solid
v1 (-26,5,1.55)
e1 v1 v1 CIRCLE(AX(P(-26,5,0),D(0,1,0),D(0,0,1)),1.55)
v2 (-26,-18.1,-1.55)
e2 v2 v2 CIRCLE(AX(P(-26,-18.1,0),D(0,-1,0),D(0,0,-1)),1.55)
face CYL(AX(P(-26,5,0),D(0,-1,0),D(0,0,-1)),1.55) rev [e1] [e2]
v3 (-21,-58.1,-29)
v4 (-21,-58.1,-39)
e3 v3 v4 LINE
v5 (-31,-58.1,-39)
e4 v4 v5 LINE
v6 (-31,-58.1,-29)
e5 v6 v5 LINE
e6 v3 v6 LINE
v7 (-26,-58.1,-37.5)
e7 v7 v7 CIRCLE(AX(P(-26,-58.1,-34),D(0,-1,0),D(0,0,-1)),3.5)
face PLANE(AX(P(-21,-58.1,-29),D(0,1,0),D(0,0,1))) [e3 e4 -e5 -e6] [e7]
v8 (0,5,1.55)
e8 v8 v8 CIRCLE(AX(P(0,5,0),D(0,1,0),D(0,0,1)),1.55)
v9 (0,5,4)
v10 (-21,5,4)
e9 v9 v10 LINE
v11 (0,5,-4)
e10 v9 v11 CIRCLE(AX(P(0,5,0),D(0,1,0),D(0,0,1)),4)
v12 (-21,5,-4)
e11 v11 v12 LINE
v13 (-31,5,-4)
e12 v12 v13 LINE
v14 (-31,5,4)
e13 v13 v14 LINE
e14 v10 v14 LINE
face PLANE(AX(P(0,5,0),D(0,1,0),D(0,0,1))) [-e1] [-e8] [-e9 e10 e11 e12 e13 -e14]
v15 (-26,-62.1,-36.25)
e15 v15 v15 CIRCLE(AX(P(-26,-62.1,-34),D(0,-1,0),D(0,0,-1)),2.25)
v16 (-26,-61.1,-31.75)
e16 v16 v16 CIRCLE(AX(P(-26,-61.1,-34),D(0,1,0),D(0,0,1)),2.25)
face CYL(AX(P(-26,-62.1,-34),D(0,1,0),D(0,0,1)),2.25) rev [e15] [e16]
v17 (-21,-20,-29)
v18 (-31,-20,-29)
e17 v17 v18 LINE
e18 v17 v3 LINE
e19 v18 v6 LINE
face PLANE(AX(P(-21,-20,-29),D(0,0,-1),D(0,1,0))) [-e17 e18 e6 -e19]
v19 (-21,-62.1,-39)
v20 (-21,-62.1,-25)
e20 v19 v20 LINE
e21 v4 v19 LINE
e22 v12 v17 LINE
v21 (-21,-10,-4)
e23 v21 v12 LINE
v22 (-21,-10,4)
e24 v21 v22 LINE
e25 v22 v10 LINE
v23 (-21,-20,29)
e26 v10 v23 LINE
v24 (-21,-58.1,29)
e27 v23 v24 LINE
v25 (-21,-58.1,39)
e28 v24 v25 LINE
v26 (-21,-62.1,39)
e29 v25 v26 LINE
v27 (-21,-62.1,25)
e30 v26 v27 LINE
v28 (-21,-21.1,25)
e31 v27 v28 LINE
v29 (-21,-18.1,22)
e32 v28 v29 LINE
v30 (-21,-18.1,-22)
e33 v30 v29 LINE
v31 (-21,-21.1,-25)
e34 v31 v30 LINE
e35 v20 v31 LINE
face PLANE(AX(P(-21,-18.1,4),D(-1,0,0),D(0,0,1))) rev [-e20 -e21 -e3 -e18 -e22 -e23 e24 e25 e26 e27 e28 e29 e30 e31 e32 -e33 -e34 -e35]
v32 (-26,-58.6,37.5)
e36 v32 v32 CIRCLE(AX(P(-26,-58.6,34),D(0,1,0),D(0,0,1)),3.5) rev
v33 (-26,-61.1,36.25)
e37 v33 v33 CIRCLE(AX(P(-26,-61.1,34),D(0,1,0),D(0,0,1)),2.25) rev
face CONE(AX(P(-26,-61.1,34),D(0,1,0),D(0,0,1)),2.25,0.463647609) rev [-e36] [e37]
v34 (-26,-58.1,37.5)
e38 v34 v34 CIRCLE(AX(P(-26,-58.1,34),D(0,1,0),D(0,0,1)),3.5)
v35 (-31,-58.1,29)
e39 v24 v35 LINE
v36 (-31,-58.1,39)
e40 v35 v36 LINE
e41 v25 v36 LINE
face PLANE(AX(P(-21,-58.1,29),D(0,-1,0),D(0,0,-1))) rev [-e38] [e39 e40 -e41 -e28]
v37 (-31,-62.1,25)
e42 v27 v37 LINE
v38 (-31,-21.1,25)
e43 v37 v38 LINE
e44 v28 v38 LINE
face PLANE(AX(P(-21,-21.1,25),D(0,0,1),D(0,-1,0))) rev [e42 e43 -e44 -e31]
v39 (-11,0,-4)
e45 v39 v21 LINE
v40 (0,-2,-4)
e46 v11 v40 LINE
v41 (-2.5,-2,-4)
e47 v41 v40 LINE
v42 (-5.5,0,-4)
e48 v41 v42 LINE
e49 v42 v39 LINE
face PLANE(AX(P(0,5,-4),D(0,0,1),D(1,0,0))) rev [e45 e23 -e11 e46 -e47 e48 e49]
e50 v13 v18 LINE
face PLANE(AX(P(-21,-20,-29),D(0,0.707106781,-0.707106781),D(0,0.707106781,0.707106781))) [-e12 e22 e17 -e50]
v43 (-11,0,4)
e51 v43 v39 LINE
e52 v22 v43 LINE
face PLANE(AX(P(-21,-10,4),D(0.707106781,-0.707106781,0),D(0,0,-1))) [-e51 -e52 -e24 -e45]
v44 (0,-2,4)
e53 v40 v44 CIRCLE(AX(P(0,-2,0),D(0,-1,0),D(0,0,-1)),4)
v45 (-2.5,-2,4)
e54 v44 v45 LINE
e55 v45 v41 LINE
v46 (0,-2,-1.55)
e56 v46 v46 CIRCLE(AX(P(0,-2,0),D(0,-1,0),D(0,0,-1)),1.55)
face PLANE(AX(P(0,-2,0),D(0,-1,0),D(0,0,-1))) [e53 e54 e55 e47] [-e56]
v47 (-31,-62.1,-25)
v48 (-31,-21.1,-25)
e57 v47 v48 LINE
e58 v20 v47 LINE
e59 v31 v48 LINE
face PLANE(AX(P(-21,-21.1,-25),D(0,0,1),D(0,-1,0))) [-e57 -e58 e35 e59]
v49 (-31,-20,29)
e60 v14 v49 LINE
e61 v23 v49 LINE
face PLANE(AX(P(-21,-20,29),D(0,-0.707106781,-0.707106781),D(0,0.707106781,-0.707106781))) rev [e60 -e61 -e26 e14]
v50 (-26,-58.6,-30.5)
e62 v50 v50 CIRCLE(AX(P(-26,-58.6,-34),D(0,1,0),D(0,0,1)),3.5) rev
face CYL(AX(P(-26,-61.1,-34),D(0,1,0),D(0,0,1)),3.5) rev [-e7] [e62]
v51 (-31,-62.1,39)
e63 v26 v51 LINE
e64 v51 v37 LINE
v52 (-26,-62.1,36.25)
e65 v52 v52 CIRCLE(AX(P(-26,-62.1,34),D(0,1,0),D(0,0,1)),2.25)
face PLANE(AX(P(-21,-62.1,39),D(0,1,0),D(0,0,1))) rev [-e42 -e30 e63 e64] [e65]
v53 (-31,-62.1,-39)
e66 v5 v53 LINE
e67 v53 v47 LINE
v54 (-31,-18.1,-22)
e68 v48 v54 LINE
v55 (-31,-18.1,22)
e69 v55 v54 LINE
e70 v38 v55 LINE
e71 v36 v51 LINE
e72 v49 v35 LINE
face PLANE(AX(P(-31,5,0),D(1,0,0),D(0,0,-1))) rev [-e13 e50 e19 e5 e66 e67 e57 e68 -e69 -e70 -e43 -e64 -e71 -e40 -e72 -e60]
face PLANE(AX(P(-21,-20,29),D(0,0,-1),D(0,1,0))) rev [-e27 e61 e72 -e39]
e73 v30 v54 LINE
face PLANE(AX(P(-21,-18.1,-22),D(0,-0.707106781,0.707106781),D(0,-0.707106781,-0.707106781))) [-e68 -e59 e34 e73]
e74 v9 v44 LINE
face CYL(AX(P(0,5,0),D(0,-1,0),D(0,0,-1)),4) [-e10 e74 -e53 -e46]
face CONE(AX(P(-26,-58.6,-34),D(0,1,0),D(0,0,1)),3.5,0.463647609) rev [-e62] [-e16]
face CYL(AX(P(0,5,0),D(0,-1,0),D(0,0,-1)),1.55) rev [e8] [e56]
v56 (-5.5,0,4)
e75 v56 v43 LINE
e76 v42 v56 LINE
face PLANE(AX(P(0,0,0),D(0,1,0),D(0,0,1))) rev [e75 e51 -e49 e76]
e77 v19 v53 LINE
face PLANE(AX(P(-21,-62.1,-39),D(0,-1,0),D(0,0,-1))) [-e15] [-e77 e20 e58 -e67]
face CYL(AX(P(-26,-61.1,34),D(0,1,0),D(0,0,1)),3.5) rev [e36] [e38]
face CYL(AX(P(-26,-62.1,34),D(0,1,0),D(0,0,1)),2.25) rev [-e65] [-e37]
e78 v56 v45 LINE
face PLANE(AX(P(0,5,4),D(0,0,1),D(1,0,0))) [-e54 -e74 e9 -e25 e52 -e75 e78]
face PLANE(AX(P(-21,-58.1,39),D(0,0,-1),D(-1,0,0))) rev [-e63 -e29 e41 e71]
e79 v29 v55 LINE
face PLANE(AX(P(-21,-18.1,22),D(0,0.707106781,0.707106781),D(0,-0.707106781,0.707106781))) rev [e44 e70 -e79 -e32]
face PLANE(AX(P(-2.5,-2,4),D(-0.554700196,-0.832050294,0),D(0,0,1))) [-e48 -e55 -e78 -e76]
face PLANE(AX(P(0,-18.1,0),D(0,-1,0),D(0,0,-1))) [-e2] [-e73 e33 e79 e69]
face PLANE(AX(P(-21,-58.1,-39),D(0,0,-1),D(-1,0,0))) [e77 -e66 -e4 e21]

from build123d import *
from build123d.topology import SkipClean

# Parameters (mm, degrees)
SKETCH1_R                 = 1.55
BOSS_EXTRUDE1_DEPTH       = 5
BOSS_EXTRUDE2_START       = 2
SKETCH2_R                 = 1.55
BOSS_EXTRUDE2_DEPTH       = 2
CHAMFER1_SIZE2            = 2
CHAMFER1_SIZE             = 3
BOSS_EXTRUDE3_START       = 18.1
SKETCH3_W                 = 10
SKETCH3_H                 = 8
SKETCH3_R                 = 1.55
BOSS_EXTRUDE3_DEPTH       = 18.1
BOSS_EXTRUDE4_DEPTH       = 10
CHAMFER2_SIZE             = 10
SKETCH6_R                 = 2.25
CUT_EXTRUDE2_DEPTH        = 81.396579529
SKETCH7_R                 = 3.5
CUT_EXTRUDE3_DEPTH        = 3
CHAMFER3_SIZE2            = 1.25
CHAMFER3_SIZE             = 2.5
CHAMFER3_OF_MIRROR2_SIZE2 = 1.25
CHAMFER3_OF_MIRROR2_SIZE  = 2.5


with BuildPart() as part:
    # Sketch1 → Boss-Extrude1 (new body)
    with BuildSketch(Plane(origin=(0, 0, 0), x_dir=(1, 0, 0), z_dir=(0, 1, 0))):
        with BuildLine():
            Line((0, 4), (-31, 4))
            Line((-31, 4), (-31, -4))
            Line((-31, -4), (0, -4))
            ThreePointArc((0, -4), (4, 0), (0, 4))
        make_face()
        with Locations(Location((0, 0, 0), (0, 0, 270))):
            Circle(SKETCH1_R, mode=Mode.SUBTRACT)
        with Locations(Location((-26, 0, 0), (0, 0, 270))):
            Circle(SKETCH1_R, mode=Mode.SUBTRACT)
    extrude(amount=BOSS_EXTRUDE1_DEPTH)

    # Sketch2 → Boss-Extrude2 (add)
    with SkipClean():  # the faces are left unmerged after this step: merging them gives an invalid solid
        with BuildSketch(Plane.XZ.offset(BOSS_EXTRUDE2_START)):
            with BuildLine():
                Line((0, 4), (-2.5, 4))
                Line((-2.5, 4), (-2.5, -4))
                Line((-2.5, -4), (0, -4))
                ThreePointArc((0, -4), (4, 0), (0, 4))
            make_face()
            with Locations(Location((0, 0, 0), (0, 0, 270))):
                Circle(SKETCH2_R, mode=Mode.SUBTRACT)
        extrude(amount=-BOSS_EXTRUDE2_DEPTH)

    # Chamfer1
    chamfer1_edges = [part.edges().sort_by_distance(p)[0] for p in [
        (-2.5, 0, 0),
    ]]
    chamfer1_side = [part.faces().sort_by_distance(p)[0] for p in [
        (-2.54, 0, 0),
    ]]
    chamfer(chamfer1_edges, length=CHAMFER1_SIZE - 0.0001, length2=CHAMFER1_SIZE2 - 0.0001, reference=chamfer1_side[0])  # a hair under: the kernel refuses the full size

    # Sketch3 → Boss-Extrude3 (add)
    with BuildSketch(Plane.XZ.offset(BOSS_EXTRUDE3_START)):
        with Locations((-26, 0)):
            Rectangle(SKETCH3_W, SKETCH3_H)
        with Locations(Location((-26, 0, 0), (0, 0, 270))):
            Circle(SKETCH3_R, mode=Mode.SUBTRACT)
    extrude(amount=-BOSS_EXTRUDE3_DEPTH)

    # Sketch4 → Boss-Extrude4 (add)
    with BuildSketch(Plane.ZY.offset(31)):
        Polygon((-4, -18.1), (-22, -18.1), (-25, -21.1), (-25, -62.1), (-39, -62.1), (-39, -58.1), (-29, -58.1), (-29, -20), (-4, 5), align=None)
    boss_extrude4 = extrude(amount=-BOSS_EXTRUDE4_DEPTH)

    # Mirror1: Boss-Extrude4 across plane
    add(boss_extrude4.mirror(Plane.XY))

    # Chamfer2
    chamfer2_edges = [part.edges().sort_by_distance(p)[0] for p in [
        (-21, 0, 0),
    ]]
    chamfer(chamfer2_edges, length=CHAMFER2_SIZE)

    # Sketch6 → Cut-Extrude2 (cut, through all)
    with BuildSketch(Plane(origin=(0, -58.1, 0), x_dir=(1, 0, 0), z_dir=(0, 1, 0))):
        with Locations(Location((-26, -34, 0), (0, 0, 270))):
            Circle(SKETCH6_R)
    cut_extrude2 = extrude(amount=-CUT_EXTRUDE2_DEPTH, mode=Mode.SUBTRACT)

    # Sketch7 → Cut-Extrude3 (cut)
    with BuildSketch(Plane(origin=(0, -58.1, 0), x_dir=(1, 0, 0), z_dir=(0, 1, 0))):
        with Locations(Location((-26, -34, 0), (0, 0, 270))):
            Circle(SKETCH7_R)
    cut_extrude3 = extrude(amount=-CUT_EXTRUDE3_DEPTH, mode=Mode.SUBTRACT)

    # Chamfer3
    chamfer3_edges = [part.edges().sort_by_distance(p)[0] for p in [
        (-26, -61.1, 30.5),
    ]]
    chamfer3_side = [part.faces().sort_by_distance(p)[0] for p in [
        (-26, -61.075, 30.5),
    ]]
    chamfer(chamfer3_edges, length=CHAMFER3_SIZE - 0.0001, length2=CHAMFER3_SIZE2 - 0.0001, reference=chamfer3_side[0])  # a hair under: the kernel refuses the full size

    # Mirror2: Cut-Extrude2, Cut-Extrude3 across plane
    add(cut_extrude2.mirror(Plane.XY), mode=Mode.SUBTRACT)
    add(cut_extrude3.mirror(Plane.XY), mode=Mode.SUBTRACT)

    # Chamfer3 of Mirror2
    chamfer3_of_mirror2_edges = [part.edges().sort_by_distance(p)[0] for p in [
        (-26, -61.1, -30.5),
    ]]
    chamfer3_of_mirror2_side = [part.faces().sort_by_distance(p)[0] for p in [
        (-26, -61.075, -30.5),
    ]]
    chamfer(chamfer3_of_mirror2_edges, length=CHAMFER3_OF_MIRROR2_SIZE - 0.0001, length2=CHAMFER3_OF_MIRROR2_SIZE2 - 0.0001, reference=chamfer3_of_mirror2_side[0])  # a hair under: the kernel refuses the full size


solid = part.part
